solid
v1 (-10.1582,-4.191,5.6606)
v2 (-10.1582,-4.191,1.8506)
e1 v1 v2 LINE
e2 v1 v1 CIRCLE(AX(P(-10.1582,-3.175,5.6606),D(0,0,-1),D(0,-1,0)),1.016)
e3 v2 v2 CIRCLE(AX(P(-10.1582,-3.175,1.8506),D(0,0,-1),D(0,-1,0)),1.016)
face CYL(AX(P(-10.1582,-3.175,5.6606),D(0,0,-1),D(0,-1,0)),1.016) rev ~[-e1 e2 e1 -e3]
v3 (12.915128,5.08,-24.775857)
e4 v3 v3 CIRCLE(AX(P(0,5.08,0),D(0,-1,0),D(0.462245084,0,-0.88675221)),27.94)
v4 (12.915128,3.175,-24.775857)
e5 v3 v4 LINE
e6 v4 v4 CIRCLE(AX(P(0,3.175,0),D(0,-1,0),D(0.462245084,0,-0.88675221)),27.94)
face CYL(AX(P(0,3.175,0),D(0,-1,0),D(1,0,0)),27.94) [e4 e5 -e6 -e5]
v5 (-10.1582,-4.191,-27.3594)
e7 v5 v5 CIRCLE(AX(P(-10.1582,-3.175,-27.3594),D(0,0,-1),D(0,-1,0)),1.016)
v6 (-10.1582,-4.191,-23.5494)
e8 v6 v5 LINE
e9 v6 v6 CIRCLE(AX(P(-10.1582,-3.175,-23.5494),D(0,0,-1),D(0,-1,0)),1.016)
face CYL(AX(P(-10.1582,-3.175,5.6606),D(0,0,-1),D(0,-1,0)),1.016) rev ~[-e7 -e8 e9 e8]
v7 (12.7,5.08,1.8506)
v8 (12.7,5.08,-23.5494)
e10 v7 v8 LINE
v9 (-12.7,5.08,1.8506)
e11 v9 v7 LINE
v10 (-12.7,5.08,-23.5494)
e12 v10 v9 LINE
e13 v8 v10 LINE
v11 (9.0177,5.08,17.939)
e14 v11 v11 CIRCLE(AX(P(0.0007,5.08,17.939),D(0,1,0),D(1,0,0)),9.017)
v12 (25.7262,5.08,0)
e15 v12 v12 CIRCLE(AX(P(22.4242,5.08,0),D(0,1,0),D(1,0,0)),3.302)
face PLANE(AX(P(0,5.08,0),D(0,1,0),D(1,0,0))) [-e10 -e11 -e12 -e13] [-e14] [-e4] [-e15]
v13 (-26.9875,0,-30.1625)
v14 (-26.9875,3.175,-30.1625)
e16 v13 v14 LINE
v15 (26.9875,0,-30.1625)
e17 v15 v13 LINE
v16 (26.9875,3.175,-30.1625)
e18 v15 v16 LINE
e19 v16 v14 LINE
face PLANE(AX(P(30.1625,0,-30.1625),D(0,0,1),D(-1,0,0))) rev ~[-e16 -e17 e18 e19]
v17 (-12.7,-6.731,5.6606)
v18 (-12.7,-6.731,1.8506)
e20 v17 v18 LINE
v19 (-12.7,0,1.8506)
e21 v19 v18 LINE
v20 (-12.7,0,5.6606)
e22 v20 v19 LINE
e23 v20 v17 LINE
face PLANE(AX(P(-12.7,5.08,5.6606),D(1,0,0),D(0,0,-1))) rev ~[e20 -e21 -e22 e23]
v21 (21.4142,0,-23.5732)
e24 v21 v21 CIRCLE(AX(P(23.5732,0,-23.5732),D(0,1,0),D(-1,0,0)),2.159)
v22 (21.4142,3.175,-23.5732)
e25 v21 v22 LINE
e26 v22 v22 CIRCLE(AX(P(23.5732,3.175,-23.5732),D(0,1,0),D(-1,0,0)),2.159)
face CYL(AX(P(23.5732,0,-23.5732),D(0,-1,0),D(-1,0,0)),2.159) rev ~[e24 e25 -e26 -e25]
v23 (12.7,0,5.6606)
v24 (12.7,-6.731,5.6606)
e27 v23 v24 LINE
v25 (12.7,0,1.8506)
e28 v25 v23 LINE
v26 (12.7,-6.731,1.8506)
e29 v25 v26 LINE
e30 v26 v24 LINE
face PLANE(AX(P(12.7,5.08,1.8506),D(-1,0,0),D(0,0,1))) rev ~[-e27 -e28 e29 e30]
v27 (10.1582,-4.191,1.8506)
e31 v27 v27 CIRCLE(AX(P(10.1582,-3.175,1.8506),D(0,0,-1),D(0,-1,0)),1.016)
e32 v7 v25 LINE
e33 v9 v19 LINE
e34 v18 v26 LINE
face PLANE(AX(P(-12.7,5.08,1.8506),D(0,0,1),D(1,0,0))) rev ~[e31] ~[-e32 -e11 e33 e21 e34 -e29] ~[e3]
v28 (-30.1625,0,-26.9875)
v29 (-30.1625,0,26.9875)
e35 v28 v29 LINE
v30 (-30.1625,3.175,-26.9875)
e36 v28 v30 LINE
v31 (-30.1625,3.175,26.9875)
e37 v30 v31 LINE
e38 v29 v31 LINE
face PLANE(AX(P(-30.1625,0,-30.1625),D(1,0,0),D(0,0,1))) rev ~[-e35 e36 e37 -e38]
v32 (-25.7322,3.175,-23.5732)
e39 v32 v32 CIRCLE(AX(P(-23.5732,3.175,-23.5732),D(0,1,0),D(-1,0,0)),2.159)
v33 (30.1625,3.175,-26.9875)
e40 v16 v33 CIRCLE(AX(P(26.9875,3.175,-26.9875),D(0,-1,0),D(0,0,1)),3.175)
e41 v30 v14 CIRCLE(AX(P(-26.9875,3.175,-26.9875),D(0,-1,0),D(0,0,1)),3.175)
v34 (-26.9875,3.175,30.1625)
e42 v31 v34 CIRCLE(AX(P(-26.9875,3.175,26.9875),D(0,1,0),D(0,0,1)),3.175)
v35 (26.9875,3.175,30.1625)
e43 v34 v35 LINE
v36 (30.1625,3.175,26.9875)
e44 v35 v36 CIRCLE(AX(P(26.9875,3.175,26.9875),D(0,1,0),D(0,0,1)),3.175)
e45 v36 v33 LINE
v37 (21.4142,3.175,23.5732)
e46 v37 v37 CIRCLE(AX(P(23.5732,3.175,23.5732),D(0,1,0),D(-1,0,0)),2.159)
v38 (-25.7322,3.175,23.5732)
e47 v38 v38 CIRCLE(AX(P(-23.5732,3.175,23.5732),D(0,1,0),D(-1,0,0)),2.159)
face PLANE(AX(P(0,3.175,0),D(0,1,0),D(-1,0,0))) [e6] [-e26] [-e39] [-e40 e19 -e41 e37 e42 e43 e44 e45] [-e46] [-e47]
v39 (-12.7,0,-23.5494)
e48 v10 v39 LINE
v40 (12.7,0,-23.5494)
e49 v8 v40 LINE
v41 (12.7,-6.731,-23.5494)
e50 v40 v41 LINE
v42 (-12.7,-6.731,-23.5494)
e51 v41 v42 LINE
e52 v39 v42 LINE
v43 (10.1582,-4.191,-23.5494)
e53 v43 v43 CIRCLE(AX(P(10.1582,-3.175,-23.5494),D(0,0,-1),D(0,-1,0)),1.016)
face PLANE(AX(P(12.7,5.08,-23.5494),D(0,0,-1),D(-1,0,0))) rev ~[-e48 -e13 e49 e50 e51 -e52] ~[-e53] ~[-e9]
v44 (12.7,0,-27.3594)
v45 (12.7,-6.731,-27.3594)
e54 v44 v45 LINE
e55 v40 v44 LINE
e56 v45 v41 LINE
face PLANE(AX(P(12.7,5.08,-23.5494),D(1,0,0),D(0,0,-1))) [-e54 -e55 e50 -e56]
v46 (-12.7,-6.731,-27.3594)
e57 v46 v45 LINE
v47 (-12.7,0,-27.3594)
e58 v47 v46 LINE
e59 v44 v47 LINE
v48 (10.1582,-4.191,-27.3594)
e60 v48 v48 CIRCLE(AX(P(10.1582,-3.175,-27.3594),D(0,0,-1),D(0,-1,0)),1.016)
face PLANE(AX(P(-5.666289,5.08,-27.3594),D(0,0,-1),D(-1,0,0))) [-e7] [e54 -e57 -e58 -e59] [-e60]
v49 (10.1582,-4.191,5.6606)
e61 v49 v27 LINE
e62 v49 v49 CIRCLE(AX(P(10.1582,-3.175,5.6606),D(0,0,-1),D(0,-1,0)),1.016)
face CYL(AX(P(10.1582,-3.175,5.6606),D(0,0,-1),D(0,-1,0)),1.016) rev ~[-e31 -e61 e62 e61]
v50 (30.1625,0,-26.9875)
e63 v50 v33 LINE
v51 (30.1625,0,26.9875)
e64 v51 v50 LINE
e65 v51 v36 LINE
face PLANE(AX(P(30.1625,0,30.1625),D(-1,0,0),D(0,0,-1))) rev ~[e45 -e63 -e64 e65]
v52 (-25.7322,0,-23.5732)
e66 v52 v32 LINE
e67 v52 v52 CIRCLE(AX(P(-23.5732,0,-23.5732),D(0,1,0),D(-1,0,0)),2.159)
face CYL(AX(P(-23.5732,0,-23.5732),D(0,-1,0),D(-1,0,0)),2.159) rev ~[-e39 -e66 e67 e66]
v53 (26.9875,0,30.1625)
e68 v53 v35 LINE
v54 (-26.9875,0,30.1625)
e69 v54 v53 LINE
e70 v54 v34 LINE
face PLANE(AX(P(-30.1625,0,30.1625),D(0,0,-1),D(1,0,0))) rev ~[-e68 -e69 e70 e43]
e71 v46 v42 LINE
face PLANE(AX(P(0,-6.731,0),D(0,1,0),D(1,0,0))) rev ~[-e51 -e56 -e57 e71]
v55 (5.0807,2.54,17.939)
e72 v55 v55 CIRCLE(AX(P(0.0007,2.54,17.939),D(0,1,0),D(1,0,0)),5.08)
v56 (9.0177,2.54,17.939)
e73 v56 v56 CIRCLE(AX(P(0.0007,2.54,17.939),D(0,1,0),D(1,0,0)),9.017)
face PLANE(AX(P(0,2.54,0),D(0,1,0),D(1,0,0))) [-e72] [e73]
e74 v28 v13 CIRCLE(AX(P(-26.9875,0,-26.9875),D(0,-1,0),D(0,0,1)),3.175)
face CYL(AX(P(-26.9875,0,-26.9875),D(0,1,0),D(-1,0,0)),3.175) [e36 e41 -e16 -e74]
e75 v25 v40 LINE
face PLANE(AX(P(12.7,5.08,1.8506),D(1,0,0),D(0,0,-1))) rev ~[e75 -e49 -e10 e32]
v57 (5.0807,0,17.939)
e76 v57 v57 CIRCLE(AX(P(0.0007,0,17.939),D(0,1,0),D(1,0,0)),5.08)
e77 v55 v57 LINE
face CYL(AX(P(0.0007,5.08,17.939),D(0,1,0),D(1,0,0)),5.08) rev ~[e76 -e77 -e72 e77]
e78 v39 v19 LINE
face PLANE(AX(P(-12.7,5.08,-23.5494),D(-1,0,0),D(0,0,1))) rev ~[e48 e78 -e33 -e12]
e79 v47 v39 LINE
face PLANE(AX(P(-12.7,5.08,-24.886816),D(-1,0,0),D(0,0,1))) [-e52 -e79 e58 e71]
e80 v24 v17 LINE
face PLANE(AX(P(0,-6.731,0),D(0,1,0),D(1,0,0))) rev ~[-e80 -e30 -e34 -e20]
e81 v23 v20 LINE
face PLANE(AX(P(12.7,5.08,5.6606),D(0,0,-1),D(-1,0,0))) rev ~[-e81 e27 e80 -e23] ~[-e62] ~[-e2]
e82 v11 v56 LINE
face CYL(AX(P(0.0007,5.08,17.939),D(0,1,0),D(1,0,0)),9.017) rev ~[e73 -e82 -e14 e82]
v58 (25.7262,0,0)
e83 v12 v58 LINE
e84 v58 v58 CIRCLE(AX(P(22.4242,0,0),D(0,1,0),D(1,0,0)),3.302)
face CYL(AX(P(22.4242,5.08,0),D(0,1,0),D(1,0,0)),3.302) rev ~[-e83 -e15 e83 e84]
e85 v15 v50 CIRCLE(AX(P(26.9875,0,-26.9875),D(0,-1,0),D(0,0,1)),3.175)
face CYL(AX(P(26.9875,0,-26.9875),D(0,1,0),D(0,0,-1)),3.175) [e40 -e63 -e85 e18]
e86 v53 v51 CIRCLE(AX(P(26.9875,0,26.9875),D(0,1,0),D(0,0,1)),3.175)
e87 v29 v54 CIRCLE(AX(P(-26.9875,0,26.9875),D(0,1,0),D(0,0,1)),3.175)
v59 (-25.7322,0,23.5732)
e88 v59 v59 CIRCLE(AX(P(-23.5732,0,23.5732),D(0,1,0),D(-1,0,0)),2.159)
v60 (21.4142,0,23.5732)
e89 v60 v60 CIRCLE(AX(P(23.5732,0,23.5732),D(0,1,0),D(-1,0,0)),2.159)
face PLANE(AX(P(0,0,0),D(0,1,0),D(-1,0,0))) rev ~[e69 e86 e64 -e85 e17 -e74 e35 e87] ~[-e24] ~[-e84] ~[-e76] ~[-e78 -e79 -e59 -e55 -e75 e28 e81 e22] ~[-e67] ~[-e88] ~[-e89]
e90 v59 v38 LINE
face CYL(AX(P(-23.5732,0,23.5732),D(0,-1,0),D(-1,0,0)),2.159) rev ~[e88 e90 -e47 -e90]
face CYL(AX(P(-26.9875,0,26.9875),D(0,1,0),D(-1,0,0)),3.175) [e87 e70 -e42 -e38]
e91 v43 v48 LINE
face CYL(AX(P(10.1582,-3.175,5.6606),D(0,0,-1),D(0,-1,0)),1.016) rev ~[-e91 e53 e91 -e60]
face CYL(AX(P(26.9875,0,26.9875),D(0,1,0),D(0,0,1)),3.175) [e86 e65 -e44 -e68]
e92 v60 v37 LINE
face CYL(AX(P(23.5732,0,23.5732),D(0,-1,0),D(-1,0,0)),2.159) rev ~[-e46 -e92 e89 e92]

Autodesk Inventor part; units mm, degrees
ref_plane "YZ Plane" through (0, 0, 0) normal (1, 0, 0) x (0, 1, 0)
ref_plane "XZ Plane" through (0, 0, 0) normal (0, 1, 0) x (-1, 0, 0)
ref_plane "XY Plane" through (0, 0, 0) normal (0, 0, 1) x (1, 0, 0)
sketch "Sketch1" plane through (0, 0, 0) normal (0, 1, 0) x (-1, 0, 0)
  line L0 (30.1625, 30.1625) -> (-30.1625, 30.1625)
  line L1 (-30.1625, 30.1625) -> (-30.1625, -30.1625)
  line L2 (-30.1625, -30.1625) -> (30.1625, -30.1625)
  line L3 (30.1625, -30.1625) -> (30.1625, 30.1625)
  circle A0 centre (0, 0) radius 33.3375 construction
  circle A1 centre (0, 0) radius 28.575
  line L4 (-30.1625, 30.1625) -> (30.1625, -30.1625) construction
  line L5 (30.1625, 30.1625) -> (-30.1625, -30.1625) construction
  circle A2 centre (23.5732, 23.5732) radius 2.159
  circle A3 centre (23.5732, -23.5732) radius 2.159
  circle A4 centre (-23.5732, 23.5732) radius 2.159
  circle A5 centre (-23.5732, -23.5732) radius 2.159
  point P0 (0, 0)
  point P1 (0, 0)
  dimension "d0" = 60.325
  dimension "d1" = 60.325
  dimension "d2" = 66.675
  dimension "d3" = 57.15
  dimension "d4" = 4.318
  dimension "d5" = 4.318
  dimension "d6" = 4.318
  dimension "d7" = 4.318
extrude "Extrusion1" add sketch "Sketch1" along normal blind 3.175 contours L3 L2 L1 L0 | A1
sketch "Sketch2" plane through (0, 3.175, 0) normal (0, 1, 0) x (1, 0, 0)
  circle A0 centre (0, 0) radius 27.94
  circle A1 centre (0, 0) radius 28.575 construction
  point P0 (0, 0)
  dimension "d10" = 55.88
  dimension "d17" = 57.15
extrude "Extrusion2" add sketch "Sketch2" along normal blind 1.905
fillet "Fillet1" radius 3.175 4 edges at (30.1625, 1.5875, 30.1625) (-30.1625, 1.5875, 30.1625) (30.1625, 1.5875, -30.1625) (-30.1625, 1.5875, -30.1625)
sketch "Sketch3" plane through (0, 5.08, 0) normal (0, 1, 0) x (1, 0, 0)
  line L0 (-12.7, -1.8506) -> (12.7, -1.8506)
  line L1 (12.7, -1.8506) -> (12.7, 23.5494)
  line L2 (12.7, 23.5494) -> (-12.7, 23.5494)
  line L3 (-12.7, 23.5494) -> (-12.7, -1.8506)
  circle A0 centre (0, 0) radius 27.94
  circle A1 centre (0, 0) radius 27.94 construction
  circle A2 centre (0.0007, -17.939) radius 5.08
  line L4 (16.9084, 0) -> (27.94, 0) construction
  circle A3 centre (22.4242, 0) radius 3.302
  circle A4 centre (0.0007, -17.939) radius 9.017
  line L5 (-12.7, 23.5494) -> (12.7, 23.5494)
  line L6 (12.7, 23.5494) -> (12.7, 27.3594)
  line L7 (12.7, 27.3594) -> (-12.7, 27.3594)
  line L8 (-12.7, 27.3594) -> (-12.7, 23.5494)
  line L9 (-12.7, -1.8506) -> (12.7, -1.8506)
  line L10 (12.7, -1.8506) -> (12.7, -5.6606)
  line L11 (12.7, -5.6606) -> (-12.7, -5.6606)
  line L12 (-12.7, -5.6606) -> (-12.7, -1.8506)
  circle A5 centre (0, 0) radius 27.94 construction
  line L13 (9.7799, 26.1725) -> (9.7799, -5.6606) construction
  line L14 (-10.16, 27.3594) -> (-10.16, -5.6606) construction
  circle A6 centre (22.4242, 0) radius 5.08 construction
  line L15 (-18.288, 29.1374) -> (18.288, 29.1374) construction
  line L16 (18.288, 29.1374) -> (18.288, -7.4386) construction
  line L17 (18.288, -7.4386) -> (-18.288, -7.4386) construction
  line L18 (-18.288, -7.4386) -> (-18.288, 29.1374) construction
  line L19 (-18.288, 29.1374) -> (18.288, -7.4386) construction
  line L20 (18.288, 29.1374) -> (-18.288, -7.4386) construction
  line L21 (18.9952, 6.35) -> (25.8532, 6.35) construction
  line L22 (25.8532, 6.35) -> (25.8532, -6.35) construction
  line L23 (25.8532, -6.35) -> (18.9952, -6.35) construction
  line L24 (18.9952, -6.35) -> (18.9952, 6.35) construction
  line L25 (18.9952, 6.35) -> (25.8532, -6.35) construction
  line L26 (25.8532, 6.35) -> (18.9952, -6.35) construction
  circle A7 centre (0.0007, -17.939) radius 9.525 construction
  point P0 (0, 10.8494)
  dimension "d18" = 25.4
  dimension "d19" = 25.4
  dimension "d32" = 10.16
  dimension "d33" = 6.604
  dimension "d34" = 18.034
  dimension "d37" = 3.81
  dimension "d38" = 3.81
  dimension "d48" = 10.16
  dimension "d49" = 36.576
  dimension "d50" = 36.576
  dimension "d51" = 6.858
  dimension "d52" = 12.7
  dimension "d53" = 19.05
extrude "Extrusion4" cut sketch "Sketch3" against normal through all contours L3 L2 L1 L0 | A2 | A3
extrude "Extrusion5" cut sketch "Sketch3" against normal blind 2.54 contours A4
extrude "Extrusion6" add sketch "Sketch3" against normal blind 11.811 separate body contours L0 L10 L11 L12 | L8 A0 L7 L6 L2 | L8 L7 A0 | A0 L7 L6
sketch "Sketch4" plane through (-12.7, 5.08, 5.6606) normal (0, 0, 1) x (1, 0, 0)
  line L0 (25.4, -8.255) -> (0, -8.255) construction
  line L1 (25.4, 0) -> (25.4, -11.811) construction
  line L2 (0, 0) -> (0, -11.811) construction
  point P0 (12.7, -5.08)
  point P1 (2.5418, -8.255)
  point P2 (22.8582, -8.255)
hole "Hole1" at (10.1582, -3.175, 5.6606) at (-10.1582, -3.175, 5.6606) direction (0, 0, -1) diameter 2.032 end through all bodies 2
combine bodies "Combine1" operation type add bodies to combine 1 2
delete faces "Delete1" heal yes whole lump no faces at (10.3555, 4.445, -27.3594) (-8.0109, 4.445, -27.3594) (12.7, 3.81, -26.5352) (-12.7, 3.81, -25.711)
properties part number "icarus-sam-instrument-mount"
